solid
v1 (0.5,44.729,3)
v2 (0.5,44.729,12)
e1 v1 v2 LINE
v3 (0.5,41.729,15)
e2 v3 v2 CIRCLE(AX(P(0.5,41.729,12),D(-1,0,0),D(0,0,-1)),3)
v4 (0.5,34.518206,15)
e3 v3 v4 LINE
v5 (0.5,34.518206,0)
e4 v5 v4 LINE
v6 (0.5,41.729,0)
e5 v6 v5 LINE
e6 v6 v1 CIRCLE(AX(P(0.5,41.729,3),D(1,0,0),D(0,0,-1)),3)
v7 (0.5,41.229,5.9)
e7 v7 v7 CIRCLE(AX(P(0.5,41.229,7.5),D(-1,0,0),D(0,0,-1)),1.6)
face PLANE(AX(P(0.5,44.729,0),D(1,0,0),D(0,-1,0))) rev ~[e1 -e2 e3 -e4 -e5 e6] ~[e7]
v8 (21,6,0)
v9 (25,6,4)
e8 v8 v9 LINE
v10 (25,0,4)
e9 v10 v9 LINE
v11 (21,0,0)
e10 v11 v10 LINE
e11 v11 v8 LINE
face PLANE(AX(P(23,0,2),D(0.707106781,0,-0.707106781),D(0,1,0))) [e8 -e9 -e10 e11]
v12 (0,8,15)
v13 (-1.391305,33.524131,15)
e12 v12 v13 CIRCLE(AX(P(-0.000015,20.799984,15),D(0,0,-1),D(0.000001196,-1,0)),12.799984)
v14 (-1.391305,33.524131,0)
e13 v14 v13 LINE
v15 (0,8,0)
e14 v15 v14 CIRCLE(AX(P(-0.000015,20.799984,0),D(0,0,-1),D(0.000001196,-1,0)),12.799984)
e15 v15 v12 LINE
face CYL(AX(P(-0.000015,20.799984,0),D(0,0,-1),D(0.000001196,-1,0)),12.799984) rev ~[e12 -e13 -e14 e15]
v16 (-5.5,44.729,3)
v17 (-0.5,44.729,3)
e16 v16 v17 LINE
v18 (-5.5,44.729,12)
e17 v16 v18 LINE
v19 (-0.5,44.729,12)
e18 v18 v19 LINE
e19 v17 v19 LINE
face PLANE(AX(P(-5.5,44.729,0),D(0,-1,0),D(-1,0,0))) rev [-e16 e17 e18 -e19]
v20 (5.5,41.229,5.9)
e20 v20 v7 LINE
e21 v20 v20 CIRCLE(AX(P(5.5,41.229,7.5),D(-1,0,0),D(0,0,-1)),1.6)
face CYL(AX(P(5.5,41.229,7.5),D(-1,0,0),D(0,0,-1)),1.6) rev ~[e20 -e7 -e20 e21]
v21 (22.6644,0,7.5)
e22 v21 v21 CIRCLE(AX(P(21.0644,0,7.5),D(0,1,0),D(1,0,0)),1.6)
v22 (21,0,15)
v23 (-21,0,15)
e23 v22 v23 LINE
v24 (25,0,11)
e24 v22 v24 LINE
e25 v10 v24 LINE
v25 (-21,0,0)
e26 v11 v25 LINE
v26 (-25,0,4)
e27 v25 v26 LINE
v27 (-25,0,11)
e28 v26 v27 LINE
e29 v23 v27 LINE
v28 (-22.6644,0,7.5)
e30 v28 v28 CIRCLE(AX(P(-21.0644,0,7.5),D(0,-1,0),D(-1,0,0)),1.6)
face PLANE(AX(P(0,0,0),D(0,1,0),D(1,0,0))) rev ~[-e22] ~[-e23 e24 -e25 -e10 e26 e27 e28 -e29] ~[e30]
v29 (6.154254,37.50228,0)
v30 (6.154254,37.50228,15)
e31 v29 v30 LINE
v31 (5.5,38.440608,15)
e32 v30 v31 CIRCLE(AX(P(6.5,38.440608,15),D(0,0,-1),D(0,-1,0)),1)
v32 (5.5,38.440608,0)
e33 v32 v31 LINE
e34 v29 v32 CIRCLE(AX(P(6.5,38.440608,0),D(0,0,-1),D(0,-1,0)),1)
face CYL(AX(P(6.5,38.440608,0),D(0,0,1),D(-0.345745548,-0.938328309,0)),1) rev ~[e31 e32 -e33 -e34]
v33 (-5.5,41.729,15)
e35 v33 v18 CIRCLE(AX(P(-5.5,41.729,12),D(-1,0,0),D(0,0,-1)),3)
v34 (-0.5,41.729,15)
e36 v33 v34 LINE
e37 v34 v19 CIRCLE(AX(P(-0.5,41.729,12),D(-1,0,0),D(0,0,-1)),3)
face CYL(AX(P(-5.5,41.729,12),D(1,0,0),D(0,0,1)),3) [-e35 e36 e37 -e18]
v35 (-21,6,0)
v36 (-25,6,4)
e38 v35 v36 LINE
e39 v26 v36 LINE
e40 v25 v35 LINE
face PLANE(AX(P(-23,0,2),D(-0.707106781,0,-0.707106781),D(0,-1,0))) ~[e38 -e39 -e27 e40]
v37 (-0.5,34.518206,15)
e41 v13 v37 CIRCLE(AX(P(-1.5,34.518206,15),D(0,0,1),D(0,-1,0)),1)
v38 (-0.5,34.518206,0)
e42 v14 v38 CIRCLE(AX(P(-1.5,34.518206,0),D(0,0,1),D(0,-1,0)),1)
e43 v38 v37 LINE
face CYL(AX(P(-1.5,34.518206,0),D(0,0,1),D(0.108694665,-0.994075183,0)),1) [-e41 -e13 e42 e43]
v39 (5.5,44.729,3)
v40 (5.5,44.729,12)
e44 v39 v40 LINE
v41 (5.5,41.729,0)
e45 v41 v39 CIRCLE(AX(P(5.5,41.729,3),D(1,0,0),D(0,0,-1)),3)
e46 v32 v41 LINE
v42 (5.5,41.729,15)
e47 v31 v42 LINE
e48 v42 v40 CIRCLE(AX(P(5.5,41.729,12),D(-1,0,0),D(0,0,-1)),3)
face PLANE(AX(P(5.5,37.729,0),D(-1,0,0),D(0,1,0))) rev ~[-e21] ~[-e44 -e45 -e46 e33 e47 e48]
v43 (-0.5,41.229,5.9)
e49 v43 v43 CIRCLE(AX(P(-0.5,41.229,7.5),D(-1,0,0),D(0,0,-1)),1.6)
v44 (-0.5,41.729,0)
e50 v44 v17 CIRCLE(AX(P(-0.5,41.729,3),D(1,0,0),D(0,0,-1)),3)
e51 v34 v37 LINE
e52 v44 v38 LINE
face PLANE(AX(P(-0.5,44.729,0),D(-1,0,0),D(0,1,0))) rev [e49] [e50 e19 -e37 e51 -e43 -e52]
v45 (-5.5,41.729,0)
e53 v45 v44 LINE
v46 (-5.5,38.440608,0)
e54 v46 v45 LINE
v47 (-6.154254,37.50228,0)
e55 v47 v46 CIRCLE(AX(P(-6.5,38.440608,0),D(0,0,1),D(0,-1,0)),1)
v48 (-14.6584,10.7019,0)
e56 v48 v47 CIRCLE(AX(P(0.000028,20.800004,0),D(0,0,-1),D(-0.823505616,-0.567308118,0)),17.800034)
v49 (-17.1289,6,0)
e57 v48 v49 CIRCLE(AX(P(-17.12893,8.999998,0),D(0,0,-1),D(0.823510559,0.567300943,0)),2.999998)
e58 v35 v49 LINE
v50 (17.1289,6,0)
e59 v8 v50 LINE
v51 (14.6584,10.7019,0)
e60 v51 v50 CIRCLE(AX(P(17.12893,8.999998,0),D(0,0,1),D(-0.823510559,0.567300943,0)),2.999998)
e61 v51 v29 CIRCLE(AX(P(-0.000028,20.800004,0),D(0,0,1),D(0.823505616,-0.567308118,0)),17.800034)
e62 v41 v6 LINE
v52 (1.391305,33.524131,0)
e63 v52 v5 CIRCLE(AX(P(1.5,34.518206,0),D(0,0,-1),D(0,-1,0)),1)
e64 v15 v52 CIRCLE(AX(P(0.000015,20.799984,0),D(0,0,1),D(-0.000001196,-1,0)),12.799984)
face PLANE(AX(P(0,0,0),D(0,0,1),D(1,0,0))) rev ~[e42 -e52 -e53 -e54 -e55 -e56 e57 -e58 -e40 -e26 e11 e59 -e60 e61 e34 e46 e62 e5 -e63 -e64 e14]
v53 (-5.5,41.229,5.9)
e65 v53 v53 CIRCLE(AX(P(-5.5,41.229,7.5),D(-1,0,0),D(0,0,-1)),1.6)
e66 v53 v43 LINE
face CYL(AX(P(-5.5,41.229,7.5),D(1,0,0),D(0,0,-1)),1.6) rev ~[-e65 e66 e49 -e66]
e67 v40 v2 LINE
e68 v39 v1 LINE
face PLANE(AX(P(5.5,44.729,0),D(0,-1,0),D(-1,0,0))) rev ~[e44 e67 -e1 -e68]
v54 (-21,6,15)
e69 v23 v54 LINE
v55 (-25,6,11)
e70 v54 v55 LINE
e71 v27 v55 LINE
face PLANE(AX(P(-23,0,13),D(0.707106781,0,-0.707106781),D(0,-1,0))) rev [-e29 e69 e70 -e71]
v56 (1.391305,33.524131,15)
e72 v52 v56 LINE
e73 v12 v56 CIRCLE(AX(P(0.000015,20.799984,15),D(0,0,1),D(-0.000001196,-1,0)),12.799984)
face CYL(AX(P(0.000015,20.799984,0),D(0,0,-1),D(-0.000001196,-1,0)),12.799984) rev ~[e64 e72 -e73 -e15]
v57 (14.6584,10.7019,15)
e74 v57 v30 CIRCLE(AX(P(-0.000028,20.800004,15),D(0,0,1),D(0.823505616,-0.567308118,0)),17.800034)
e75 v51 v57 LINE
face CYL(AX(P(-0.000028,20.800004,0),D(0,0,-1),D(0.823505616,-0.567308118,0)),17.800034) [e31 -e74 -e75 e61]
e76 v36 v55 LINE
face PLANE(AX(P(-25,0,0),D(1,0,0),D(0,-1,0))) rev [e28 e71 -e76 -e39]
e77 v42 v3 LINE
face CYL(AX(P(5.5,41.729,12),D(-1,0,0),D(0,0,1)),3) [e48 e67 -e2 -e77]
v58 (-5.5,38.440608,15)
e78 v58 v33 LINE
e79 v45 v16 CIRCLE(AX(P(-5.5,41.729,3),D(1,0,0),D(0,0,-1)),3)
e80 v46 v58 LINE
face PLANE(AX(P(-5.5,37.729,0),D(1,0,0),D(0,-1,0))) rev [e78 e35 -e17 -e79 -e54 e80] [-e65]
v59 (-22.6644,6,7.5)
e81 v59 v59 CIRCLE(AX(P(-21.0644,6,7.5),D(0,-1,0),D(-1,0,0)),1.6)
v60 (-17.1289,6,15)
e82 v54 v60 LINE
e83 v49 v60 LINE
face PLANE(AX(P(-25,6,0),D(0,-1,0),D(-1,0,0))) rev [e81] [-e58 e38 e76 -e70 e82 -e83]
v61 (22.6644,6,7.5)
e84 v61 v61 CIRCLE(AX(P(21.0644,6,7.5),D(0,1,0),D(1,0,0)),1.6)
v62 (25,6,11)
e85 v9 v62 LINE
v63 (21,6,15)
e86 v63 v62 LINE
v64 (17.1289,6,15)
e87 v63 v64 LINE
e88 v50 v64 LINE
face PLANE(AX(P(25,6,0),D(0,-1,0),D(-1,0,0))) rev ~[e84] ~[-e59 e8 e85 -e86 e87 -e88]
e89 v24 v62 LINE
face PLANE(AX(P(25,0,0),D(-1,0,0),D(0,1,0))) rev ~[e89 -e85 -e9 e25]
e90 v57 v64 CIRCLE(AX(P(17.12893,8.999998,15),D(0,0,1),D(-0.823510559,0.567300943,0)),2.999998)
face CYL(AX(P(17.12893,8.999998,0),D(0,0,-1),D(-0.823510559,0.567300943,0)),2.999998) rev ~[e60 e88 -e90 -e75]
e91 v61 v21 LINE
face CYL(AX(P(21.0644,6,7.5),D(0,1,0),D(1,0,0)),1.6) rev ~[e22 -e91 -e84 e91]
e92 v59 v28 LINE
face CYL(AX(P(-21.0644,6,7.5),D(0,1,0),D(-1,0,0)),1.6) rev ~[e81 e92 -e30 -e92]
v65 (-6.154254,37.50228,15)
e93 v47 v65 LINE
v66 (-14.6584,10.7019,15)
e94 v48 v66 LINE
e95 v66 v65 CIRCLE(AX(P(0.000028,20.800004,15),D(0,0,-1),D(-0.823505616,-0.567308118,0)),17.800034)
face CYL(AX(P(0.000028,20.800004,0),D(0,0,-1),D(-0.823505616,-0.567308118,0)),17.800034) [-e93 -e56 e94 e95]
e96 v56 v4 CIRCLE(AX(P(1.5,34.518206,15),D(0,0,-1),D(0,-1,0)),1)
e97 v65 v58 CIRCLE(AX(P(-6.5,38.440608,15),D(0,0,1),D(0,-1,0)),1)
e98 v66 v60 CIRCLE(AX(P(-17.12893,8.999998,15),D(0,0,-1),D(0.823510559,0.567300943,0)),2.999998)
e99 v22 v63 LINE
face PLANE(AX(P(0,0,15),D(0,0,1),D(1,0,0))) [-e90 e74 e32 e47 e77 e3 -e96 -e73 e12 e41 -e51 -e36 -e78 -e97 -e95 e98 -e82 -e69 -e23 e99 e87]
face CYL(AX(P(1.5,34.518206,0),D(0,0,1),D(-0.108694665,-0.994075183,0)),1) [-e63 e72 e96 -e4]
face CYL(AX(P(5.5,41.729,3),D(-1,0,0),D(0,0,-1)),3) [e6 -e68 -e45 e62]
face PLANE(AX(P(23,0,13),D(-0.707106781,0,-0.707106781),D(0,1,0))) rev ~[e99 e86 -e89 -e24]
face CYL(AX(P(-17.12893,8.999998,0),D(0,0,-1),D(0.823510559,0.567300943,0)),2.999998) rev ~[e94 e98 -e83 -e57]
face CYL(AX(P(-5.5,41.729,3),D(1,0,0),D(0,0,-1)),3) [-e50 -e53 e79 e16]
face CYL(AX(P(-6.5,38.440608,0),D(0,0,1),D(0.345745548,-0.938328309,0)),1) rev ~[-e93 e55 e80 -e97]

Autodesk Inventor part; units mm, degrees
ref_plane "YZ Plane" through (0, 0, 0) normal (1, 0, 0) x (0, 1, 0)
ref_plane "XZ Plane" through (0, 0, 0) normal (0, 1, 0) x (-1, 0, 0)
ref_plane "XY Plane" through (0, 0, 0) normal (0, 0, 1) x (1, 0, 0)
sketch "Sketch1" plane through (0, 0, 0) normal (0, 0, 1) x (1, 0, 0)
  line L0 (0, 0) -> (25, 0)
  line L1 (25, 0) -> (25, 6)
  line L2 (25, 6) -> (17.1289, 6)
  arc A0 (14.6584, 10.7019) -> (5.5, 37.729) centre (0, 20.8) ccw
  line L3 (0, 0) -> (0, 8)
  arc A1 (0, 8) -> (0.5, 33.5902) centre (0, 20.8) ccw
  arc A2 (14.6584, 10.7019) -> (17.1289, 6) centre (17.1289, 9) ccw
  line L4 (5.5, 37.729) -> (5.5, 44.729)
  line L5 (5.5, 44.729) -> (0.5, 44.729)
  line L6 (0.5, 44.729) -> (0.5, 33.5902)
  point P0 (9.8894, 6)
  dimension "d0" = 12.8
  dimension "d2" = 5
  dimension "d3" = 25
  dimension "d4" = 6
  dimension "d5" = 8
  dimension "d6" = 3
  dimension "d7" = 1
  dimension "d8" = 5
  dimension "d9" = 7
extrude "Extrusion1" add sketch "Sketch1" along normal blind 15
sketch "Sketch2" plane through (17.1289, 6, 0) normal (0, 1, 0) x (1, 0, 0)
  line L0 (7.8711, 0) -> (7.8711, -15) projected
  line L1 (7.8711, -15) -> (0, 0) construction
  line L2 (7.8711, 0) -> (0, 0) projected
  circle A0 centre (3.9355, -7.5) radius 1.6
  point P0 (-17.1289, 0)
  dimension "d15" = 3.2
extrude "Extrusion2" cut sketch "Sketch2" against normal through all
chamfer "Chamfer1" distance 4 angle 45 2 edges at (25, 3, 15) (25, 3, 0)
sketch "Sketch3" plane through (5.5, 37.729, 0) normal (1, 0, 0) x (0, 0, -1)
  line L0 (-15, 0) -> (0, 7) construction
  point P0 (0, -37.729)
  point P1 (-7.5, 3.5)
hole "Hole1" at (5.5, 41.229, 7.5) direction (-1, 0, 0) diameter 3.2 end through all
fillet "Fillet1" radius 3 2 edges at (3, 44.729, 0) (3, 44.729, 15)
fillet "Fillet1" radius 1 2 edges at (5.5, 37.729, 7.5) (0.5, 33.5902, 7.5)
mirror "Mirror1" about plane through (0, 8, 0) normal (-1, 0, 0)
properties part number "atomizer_holder"
